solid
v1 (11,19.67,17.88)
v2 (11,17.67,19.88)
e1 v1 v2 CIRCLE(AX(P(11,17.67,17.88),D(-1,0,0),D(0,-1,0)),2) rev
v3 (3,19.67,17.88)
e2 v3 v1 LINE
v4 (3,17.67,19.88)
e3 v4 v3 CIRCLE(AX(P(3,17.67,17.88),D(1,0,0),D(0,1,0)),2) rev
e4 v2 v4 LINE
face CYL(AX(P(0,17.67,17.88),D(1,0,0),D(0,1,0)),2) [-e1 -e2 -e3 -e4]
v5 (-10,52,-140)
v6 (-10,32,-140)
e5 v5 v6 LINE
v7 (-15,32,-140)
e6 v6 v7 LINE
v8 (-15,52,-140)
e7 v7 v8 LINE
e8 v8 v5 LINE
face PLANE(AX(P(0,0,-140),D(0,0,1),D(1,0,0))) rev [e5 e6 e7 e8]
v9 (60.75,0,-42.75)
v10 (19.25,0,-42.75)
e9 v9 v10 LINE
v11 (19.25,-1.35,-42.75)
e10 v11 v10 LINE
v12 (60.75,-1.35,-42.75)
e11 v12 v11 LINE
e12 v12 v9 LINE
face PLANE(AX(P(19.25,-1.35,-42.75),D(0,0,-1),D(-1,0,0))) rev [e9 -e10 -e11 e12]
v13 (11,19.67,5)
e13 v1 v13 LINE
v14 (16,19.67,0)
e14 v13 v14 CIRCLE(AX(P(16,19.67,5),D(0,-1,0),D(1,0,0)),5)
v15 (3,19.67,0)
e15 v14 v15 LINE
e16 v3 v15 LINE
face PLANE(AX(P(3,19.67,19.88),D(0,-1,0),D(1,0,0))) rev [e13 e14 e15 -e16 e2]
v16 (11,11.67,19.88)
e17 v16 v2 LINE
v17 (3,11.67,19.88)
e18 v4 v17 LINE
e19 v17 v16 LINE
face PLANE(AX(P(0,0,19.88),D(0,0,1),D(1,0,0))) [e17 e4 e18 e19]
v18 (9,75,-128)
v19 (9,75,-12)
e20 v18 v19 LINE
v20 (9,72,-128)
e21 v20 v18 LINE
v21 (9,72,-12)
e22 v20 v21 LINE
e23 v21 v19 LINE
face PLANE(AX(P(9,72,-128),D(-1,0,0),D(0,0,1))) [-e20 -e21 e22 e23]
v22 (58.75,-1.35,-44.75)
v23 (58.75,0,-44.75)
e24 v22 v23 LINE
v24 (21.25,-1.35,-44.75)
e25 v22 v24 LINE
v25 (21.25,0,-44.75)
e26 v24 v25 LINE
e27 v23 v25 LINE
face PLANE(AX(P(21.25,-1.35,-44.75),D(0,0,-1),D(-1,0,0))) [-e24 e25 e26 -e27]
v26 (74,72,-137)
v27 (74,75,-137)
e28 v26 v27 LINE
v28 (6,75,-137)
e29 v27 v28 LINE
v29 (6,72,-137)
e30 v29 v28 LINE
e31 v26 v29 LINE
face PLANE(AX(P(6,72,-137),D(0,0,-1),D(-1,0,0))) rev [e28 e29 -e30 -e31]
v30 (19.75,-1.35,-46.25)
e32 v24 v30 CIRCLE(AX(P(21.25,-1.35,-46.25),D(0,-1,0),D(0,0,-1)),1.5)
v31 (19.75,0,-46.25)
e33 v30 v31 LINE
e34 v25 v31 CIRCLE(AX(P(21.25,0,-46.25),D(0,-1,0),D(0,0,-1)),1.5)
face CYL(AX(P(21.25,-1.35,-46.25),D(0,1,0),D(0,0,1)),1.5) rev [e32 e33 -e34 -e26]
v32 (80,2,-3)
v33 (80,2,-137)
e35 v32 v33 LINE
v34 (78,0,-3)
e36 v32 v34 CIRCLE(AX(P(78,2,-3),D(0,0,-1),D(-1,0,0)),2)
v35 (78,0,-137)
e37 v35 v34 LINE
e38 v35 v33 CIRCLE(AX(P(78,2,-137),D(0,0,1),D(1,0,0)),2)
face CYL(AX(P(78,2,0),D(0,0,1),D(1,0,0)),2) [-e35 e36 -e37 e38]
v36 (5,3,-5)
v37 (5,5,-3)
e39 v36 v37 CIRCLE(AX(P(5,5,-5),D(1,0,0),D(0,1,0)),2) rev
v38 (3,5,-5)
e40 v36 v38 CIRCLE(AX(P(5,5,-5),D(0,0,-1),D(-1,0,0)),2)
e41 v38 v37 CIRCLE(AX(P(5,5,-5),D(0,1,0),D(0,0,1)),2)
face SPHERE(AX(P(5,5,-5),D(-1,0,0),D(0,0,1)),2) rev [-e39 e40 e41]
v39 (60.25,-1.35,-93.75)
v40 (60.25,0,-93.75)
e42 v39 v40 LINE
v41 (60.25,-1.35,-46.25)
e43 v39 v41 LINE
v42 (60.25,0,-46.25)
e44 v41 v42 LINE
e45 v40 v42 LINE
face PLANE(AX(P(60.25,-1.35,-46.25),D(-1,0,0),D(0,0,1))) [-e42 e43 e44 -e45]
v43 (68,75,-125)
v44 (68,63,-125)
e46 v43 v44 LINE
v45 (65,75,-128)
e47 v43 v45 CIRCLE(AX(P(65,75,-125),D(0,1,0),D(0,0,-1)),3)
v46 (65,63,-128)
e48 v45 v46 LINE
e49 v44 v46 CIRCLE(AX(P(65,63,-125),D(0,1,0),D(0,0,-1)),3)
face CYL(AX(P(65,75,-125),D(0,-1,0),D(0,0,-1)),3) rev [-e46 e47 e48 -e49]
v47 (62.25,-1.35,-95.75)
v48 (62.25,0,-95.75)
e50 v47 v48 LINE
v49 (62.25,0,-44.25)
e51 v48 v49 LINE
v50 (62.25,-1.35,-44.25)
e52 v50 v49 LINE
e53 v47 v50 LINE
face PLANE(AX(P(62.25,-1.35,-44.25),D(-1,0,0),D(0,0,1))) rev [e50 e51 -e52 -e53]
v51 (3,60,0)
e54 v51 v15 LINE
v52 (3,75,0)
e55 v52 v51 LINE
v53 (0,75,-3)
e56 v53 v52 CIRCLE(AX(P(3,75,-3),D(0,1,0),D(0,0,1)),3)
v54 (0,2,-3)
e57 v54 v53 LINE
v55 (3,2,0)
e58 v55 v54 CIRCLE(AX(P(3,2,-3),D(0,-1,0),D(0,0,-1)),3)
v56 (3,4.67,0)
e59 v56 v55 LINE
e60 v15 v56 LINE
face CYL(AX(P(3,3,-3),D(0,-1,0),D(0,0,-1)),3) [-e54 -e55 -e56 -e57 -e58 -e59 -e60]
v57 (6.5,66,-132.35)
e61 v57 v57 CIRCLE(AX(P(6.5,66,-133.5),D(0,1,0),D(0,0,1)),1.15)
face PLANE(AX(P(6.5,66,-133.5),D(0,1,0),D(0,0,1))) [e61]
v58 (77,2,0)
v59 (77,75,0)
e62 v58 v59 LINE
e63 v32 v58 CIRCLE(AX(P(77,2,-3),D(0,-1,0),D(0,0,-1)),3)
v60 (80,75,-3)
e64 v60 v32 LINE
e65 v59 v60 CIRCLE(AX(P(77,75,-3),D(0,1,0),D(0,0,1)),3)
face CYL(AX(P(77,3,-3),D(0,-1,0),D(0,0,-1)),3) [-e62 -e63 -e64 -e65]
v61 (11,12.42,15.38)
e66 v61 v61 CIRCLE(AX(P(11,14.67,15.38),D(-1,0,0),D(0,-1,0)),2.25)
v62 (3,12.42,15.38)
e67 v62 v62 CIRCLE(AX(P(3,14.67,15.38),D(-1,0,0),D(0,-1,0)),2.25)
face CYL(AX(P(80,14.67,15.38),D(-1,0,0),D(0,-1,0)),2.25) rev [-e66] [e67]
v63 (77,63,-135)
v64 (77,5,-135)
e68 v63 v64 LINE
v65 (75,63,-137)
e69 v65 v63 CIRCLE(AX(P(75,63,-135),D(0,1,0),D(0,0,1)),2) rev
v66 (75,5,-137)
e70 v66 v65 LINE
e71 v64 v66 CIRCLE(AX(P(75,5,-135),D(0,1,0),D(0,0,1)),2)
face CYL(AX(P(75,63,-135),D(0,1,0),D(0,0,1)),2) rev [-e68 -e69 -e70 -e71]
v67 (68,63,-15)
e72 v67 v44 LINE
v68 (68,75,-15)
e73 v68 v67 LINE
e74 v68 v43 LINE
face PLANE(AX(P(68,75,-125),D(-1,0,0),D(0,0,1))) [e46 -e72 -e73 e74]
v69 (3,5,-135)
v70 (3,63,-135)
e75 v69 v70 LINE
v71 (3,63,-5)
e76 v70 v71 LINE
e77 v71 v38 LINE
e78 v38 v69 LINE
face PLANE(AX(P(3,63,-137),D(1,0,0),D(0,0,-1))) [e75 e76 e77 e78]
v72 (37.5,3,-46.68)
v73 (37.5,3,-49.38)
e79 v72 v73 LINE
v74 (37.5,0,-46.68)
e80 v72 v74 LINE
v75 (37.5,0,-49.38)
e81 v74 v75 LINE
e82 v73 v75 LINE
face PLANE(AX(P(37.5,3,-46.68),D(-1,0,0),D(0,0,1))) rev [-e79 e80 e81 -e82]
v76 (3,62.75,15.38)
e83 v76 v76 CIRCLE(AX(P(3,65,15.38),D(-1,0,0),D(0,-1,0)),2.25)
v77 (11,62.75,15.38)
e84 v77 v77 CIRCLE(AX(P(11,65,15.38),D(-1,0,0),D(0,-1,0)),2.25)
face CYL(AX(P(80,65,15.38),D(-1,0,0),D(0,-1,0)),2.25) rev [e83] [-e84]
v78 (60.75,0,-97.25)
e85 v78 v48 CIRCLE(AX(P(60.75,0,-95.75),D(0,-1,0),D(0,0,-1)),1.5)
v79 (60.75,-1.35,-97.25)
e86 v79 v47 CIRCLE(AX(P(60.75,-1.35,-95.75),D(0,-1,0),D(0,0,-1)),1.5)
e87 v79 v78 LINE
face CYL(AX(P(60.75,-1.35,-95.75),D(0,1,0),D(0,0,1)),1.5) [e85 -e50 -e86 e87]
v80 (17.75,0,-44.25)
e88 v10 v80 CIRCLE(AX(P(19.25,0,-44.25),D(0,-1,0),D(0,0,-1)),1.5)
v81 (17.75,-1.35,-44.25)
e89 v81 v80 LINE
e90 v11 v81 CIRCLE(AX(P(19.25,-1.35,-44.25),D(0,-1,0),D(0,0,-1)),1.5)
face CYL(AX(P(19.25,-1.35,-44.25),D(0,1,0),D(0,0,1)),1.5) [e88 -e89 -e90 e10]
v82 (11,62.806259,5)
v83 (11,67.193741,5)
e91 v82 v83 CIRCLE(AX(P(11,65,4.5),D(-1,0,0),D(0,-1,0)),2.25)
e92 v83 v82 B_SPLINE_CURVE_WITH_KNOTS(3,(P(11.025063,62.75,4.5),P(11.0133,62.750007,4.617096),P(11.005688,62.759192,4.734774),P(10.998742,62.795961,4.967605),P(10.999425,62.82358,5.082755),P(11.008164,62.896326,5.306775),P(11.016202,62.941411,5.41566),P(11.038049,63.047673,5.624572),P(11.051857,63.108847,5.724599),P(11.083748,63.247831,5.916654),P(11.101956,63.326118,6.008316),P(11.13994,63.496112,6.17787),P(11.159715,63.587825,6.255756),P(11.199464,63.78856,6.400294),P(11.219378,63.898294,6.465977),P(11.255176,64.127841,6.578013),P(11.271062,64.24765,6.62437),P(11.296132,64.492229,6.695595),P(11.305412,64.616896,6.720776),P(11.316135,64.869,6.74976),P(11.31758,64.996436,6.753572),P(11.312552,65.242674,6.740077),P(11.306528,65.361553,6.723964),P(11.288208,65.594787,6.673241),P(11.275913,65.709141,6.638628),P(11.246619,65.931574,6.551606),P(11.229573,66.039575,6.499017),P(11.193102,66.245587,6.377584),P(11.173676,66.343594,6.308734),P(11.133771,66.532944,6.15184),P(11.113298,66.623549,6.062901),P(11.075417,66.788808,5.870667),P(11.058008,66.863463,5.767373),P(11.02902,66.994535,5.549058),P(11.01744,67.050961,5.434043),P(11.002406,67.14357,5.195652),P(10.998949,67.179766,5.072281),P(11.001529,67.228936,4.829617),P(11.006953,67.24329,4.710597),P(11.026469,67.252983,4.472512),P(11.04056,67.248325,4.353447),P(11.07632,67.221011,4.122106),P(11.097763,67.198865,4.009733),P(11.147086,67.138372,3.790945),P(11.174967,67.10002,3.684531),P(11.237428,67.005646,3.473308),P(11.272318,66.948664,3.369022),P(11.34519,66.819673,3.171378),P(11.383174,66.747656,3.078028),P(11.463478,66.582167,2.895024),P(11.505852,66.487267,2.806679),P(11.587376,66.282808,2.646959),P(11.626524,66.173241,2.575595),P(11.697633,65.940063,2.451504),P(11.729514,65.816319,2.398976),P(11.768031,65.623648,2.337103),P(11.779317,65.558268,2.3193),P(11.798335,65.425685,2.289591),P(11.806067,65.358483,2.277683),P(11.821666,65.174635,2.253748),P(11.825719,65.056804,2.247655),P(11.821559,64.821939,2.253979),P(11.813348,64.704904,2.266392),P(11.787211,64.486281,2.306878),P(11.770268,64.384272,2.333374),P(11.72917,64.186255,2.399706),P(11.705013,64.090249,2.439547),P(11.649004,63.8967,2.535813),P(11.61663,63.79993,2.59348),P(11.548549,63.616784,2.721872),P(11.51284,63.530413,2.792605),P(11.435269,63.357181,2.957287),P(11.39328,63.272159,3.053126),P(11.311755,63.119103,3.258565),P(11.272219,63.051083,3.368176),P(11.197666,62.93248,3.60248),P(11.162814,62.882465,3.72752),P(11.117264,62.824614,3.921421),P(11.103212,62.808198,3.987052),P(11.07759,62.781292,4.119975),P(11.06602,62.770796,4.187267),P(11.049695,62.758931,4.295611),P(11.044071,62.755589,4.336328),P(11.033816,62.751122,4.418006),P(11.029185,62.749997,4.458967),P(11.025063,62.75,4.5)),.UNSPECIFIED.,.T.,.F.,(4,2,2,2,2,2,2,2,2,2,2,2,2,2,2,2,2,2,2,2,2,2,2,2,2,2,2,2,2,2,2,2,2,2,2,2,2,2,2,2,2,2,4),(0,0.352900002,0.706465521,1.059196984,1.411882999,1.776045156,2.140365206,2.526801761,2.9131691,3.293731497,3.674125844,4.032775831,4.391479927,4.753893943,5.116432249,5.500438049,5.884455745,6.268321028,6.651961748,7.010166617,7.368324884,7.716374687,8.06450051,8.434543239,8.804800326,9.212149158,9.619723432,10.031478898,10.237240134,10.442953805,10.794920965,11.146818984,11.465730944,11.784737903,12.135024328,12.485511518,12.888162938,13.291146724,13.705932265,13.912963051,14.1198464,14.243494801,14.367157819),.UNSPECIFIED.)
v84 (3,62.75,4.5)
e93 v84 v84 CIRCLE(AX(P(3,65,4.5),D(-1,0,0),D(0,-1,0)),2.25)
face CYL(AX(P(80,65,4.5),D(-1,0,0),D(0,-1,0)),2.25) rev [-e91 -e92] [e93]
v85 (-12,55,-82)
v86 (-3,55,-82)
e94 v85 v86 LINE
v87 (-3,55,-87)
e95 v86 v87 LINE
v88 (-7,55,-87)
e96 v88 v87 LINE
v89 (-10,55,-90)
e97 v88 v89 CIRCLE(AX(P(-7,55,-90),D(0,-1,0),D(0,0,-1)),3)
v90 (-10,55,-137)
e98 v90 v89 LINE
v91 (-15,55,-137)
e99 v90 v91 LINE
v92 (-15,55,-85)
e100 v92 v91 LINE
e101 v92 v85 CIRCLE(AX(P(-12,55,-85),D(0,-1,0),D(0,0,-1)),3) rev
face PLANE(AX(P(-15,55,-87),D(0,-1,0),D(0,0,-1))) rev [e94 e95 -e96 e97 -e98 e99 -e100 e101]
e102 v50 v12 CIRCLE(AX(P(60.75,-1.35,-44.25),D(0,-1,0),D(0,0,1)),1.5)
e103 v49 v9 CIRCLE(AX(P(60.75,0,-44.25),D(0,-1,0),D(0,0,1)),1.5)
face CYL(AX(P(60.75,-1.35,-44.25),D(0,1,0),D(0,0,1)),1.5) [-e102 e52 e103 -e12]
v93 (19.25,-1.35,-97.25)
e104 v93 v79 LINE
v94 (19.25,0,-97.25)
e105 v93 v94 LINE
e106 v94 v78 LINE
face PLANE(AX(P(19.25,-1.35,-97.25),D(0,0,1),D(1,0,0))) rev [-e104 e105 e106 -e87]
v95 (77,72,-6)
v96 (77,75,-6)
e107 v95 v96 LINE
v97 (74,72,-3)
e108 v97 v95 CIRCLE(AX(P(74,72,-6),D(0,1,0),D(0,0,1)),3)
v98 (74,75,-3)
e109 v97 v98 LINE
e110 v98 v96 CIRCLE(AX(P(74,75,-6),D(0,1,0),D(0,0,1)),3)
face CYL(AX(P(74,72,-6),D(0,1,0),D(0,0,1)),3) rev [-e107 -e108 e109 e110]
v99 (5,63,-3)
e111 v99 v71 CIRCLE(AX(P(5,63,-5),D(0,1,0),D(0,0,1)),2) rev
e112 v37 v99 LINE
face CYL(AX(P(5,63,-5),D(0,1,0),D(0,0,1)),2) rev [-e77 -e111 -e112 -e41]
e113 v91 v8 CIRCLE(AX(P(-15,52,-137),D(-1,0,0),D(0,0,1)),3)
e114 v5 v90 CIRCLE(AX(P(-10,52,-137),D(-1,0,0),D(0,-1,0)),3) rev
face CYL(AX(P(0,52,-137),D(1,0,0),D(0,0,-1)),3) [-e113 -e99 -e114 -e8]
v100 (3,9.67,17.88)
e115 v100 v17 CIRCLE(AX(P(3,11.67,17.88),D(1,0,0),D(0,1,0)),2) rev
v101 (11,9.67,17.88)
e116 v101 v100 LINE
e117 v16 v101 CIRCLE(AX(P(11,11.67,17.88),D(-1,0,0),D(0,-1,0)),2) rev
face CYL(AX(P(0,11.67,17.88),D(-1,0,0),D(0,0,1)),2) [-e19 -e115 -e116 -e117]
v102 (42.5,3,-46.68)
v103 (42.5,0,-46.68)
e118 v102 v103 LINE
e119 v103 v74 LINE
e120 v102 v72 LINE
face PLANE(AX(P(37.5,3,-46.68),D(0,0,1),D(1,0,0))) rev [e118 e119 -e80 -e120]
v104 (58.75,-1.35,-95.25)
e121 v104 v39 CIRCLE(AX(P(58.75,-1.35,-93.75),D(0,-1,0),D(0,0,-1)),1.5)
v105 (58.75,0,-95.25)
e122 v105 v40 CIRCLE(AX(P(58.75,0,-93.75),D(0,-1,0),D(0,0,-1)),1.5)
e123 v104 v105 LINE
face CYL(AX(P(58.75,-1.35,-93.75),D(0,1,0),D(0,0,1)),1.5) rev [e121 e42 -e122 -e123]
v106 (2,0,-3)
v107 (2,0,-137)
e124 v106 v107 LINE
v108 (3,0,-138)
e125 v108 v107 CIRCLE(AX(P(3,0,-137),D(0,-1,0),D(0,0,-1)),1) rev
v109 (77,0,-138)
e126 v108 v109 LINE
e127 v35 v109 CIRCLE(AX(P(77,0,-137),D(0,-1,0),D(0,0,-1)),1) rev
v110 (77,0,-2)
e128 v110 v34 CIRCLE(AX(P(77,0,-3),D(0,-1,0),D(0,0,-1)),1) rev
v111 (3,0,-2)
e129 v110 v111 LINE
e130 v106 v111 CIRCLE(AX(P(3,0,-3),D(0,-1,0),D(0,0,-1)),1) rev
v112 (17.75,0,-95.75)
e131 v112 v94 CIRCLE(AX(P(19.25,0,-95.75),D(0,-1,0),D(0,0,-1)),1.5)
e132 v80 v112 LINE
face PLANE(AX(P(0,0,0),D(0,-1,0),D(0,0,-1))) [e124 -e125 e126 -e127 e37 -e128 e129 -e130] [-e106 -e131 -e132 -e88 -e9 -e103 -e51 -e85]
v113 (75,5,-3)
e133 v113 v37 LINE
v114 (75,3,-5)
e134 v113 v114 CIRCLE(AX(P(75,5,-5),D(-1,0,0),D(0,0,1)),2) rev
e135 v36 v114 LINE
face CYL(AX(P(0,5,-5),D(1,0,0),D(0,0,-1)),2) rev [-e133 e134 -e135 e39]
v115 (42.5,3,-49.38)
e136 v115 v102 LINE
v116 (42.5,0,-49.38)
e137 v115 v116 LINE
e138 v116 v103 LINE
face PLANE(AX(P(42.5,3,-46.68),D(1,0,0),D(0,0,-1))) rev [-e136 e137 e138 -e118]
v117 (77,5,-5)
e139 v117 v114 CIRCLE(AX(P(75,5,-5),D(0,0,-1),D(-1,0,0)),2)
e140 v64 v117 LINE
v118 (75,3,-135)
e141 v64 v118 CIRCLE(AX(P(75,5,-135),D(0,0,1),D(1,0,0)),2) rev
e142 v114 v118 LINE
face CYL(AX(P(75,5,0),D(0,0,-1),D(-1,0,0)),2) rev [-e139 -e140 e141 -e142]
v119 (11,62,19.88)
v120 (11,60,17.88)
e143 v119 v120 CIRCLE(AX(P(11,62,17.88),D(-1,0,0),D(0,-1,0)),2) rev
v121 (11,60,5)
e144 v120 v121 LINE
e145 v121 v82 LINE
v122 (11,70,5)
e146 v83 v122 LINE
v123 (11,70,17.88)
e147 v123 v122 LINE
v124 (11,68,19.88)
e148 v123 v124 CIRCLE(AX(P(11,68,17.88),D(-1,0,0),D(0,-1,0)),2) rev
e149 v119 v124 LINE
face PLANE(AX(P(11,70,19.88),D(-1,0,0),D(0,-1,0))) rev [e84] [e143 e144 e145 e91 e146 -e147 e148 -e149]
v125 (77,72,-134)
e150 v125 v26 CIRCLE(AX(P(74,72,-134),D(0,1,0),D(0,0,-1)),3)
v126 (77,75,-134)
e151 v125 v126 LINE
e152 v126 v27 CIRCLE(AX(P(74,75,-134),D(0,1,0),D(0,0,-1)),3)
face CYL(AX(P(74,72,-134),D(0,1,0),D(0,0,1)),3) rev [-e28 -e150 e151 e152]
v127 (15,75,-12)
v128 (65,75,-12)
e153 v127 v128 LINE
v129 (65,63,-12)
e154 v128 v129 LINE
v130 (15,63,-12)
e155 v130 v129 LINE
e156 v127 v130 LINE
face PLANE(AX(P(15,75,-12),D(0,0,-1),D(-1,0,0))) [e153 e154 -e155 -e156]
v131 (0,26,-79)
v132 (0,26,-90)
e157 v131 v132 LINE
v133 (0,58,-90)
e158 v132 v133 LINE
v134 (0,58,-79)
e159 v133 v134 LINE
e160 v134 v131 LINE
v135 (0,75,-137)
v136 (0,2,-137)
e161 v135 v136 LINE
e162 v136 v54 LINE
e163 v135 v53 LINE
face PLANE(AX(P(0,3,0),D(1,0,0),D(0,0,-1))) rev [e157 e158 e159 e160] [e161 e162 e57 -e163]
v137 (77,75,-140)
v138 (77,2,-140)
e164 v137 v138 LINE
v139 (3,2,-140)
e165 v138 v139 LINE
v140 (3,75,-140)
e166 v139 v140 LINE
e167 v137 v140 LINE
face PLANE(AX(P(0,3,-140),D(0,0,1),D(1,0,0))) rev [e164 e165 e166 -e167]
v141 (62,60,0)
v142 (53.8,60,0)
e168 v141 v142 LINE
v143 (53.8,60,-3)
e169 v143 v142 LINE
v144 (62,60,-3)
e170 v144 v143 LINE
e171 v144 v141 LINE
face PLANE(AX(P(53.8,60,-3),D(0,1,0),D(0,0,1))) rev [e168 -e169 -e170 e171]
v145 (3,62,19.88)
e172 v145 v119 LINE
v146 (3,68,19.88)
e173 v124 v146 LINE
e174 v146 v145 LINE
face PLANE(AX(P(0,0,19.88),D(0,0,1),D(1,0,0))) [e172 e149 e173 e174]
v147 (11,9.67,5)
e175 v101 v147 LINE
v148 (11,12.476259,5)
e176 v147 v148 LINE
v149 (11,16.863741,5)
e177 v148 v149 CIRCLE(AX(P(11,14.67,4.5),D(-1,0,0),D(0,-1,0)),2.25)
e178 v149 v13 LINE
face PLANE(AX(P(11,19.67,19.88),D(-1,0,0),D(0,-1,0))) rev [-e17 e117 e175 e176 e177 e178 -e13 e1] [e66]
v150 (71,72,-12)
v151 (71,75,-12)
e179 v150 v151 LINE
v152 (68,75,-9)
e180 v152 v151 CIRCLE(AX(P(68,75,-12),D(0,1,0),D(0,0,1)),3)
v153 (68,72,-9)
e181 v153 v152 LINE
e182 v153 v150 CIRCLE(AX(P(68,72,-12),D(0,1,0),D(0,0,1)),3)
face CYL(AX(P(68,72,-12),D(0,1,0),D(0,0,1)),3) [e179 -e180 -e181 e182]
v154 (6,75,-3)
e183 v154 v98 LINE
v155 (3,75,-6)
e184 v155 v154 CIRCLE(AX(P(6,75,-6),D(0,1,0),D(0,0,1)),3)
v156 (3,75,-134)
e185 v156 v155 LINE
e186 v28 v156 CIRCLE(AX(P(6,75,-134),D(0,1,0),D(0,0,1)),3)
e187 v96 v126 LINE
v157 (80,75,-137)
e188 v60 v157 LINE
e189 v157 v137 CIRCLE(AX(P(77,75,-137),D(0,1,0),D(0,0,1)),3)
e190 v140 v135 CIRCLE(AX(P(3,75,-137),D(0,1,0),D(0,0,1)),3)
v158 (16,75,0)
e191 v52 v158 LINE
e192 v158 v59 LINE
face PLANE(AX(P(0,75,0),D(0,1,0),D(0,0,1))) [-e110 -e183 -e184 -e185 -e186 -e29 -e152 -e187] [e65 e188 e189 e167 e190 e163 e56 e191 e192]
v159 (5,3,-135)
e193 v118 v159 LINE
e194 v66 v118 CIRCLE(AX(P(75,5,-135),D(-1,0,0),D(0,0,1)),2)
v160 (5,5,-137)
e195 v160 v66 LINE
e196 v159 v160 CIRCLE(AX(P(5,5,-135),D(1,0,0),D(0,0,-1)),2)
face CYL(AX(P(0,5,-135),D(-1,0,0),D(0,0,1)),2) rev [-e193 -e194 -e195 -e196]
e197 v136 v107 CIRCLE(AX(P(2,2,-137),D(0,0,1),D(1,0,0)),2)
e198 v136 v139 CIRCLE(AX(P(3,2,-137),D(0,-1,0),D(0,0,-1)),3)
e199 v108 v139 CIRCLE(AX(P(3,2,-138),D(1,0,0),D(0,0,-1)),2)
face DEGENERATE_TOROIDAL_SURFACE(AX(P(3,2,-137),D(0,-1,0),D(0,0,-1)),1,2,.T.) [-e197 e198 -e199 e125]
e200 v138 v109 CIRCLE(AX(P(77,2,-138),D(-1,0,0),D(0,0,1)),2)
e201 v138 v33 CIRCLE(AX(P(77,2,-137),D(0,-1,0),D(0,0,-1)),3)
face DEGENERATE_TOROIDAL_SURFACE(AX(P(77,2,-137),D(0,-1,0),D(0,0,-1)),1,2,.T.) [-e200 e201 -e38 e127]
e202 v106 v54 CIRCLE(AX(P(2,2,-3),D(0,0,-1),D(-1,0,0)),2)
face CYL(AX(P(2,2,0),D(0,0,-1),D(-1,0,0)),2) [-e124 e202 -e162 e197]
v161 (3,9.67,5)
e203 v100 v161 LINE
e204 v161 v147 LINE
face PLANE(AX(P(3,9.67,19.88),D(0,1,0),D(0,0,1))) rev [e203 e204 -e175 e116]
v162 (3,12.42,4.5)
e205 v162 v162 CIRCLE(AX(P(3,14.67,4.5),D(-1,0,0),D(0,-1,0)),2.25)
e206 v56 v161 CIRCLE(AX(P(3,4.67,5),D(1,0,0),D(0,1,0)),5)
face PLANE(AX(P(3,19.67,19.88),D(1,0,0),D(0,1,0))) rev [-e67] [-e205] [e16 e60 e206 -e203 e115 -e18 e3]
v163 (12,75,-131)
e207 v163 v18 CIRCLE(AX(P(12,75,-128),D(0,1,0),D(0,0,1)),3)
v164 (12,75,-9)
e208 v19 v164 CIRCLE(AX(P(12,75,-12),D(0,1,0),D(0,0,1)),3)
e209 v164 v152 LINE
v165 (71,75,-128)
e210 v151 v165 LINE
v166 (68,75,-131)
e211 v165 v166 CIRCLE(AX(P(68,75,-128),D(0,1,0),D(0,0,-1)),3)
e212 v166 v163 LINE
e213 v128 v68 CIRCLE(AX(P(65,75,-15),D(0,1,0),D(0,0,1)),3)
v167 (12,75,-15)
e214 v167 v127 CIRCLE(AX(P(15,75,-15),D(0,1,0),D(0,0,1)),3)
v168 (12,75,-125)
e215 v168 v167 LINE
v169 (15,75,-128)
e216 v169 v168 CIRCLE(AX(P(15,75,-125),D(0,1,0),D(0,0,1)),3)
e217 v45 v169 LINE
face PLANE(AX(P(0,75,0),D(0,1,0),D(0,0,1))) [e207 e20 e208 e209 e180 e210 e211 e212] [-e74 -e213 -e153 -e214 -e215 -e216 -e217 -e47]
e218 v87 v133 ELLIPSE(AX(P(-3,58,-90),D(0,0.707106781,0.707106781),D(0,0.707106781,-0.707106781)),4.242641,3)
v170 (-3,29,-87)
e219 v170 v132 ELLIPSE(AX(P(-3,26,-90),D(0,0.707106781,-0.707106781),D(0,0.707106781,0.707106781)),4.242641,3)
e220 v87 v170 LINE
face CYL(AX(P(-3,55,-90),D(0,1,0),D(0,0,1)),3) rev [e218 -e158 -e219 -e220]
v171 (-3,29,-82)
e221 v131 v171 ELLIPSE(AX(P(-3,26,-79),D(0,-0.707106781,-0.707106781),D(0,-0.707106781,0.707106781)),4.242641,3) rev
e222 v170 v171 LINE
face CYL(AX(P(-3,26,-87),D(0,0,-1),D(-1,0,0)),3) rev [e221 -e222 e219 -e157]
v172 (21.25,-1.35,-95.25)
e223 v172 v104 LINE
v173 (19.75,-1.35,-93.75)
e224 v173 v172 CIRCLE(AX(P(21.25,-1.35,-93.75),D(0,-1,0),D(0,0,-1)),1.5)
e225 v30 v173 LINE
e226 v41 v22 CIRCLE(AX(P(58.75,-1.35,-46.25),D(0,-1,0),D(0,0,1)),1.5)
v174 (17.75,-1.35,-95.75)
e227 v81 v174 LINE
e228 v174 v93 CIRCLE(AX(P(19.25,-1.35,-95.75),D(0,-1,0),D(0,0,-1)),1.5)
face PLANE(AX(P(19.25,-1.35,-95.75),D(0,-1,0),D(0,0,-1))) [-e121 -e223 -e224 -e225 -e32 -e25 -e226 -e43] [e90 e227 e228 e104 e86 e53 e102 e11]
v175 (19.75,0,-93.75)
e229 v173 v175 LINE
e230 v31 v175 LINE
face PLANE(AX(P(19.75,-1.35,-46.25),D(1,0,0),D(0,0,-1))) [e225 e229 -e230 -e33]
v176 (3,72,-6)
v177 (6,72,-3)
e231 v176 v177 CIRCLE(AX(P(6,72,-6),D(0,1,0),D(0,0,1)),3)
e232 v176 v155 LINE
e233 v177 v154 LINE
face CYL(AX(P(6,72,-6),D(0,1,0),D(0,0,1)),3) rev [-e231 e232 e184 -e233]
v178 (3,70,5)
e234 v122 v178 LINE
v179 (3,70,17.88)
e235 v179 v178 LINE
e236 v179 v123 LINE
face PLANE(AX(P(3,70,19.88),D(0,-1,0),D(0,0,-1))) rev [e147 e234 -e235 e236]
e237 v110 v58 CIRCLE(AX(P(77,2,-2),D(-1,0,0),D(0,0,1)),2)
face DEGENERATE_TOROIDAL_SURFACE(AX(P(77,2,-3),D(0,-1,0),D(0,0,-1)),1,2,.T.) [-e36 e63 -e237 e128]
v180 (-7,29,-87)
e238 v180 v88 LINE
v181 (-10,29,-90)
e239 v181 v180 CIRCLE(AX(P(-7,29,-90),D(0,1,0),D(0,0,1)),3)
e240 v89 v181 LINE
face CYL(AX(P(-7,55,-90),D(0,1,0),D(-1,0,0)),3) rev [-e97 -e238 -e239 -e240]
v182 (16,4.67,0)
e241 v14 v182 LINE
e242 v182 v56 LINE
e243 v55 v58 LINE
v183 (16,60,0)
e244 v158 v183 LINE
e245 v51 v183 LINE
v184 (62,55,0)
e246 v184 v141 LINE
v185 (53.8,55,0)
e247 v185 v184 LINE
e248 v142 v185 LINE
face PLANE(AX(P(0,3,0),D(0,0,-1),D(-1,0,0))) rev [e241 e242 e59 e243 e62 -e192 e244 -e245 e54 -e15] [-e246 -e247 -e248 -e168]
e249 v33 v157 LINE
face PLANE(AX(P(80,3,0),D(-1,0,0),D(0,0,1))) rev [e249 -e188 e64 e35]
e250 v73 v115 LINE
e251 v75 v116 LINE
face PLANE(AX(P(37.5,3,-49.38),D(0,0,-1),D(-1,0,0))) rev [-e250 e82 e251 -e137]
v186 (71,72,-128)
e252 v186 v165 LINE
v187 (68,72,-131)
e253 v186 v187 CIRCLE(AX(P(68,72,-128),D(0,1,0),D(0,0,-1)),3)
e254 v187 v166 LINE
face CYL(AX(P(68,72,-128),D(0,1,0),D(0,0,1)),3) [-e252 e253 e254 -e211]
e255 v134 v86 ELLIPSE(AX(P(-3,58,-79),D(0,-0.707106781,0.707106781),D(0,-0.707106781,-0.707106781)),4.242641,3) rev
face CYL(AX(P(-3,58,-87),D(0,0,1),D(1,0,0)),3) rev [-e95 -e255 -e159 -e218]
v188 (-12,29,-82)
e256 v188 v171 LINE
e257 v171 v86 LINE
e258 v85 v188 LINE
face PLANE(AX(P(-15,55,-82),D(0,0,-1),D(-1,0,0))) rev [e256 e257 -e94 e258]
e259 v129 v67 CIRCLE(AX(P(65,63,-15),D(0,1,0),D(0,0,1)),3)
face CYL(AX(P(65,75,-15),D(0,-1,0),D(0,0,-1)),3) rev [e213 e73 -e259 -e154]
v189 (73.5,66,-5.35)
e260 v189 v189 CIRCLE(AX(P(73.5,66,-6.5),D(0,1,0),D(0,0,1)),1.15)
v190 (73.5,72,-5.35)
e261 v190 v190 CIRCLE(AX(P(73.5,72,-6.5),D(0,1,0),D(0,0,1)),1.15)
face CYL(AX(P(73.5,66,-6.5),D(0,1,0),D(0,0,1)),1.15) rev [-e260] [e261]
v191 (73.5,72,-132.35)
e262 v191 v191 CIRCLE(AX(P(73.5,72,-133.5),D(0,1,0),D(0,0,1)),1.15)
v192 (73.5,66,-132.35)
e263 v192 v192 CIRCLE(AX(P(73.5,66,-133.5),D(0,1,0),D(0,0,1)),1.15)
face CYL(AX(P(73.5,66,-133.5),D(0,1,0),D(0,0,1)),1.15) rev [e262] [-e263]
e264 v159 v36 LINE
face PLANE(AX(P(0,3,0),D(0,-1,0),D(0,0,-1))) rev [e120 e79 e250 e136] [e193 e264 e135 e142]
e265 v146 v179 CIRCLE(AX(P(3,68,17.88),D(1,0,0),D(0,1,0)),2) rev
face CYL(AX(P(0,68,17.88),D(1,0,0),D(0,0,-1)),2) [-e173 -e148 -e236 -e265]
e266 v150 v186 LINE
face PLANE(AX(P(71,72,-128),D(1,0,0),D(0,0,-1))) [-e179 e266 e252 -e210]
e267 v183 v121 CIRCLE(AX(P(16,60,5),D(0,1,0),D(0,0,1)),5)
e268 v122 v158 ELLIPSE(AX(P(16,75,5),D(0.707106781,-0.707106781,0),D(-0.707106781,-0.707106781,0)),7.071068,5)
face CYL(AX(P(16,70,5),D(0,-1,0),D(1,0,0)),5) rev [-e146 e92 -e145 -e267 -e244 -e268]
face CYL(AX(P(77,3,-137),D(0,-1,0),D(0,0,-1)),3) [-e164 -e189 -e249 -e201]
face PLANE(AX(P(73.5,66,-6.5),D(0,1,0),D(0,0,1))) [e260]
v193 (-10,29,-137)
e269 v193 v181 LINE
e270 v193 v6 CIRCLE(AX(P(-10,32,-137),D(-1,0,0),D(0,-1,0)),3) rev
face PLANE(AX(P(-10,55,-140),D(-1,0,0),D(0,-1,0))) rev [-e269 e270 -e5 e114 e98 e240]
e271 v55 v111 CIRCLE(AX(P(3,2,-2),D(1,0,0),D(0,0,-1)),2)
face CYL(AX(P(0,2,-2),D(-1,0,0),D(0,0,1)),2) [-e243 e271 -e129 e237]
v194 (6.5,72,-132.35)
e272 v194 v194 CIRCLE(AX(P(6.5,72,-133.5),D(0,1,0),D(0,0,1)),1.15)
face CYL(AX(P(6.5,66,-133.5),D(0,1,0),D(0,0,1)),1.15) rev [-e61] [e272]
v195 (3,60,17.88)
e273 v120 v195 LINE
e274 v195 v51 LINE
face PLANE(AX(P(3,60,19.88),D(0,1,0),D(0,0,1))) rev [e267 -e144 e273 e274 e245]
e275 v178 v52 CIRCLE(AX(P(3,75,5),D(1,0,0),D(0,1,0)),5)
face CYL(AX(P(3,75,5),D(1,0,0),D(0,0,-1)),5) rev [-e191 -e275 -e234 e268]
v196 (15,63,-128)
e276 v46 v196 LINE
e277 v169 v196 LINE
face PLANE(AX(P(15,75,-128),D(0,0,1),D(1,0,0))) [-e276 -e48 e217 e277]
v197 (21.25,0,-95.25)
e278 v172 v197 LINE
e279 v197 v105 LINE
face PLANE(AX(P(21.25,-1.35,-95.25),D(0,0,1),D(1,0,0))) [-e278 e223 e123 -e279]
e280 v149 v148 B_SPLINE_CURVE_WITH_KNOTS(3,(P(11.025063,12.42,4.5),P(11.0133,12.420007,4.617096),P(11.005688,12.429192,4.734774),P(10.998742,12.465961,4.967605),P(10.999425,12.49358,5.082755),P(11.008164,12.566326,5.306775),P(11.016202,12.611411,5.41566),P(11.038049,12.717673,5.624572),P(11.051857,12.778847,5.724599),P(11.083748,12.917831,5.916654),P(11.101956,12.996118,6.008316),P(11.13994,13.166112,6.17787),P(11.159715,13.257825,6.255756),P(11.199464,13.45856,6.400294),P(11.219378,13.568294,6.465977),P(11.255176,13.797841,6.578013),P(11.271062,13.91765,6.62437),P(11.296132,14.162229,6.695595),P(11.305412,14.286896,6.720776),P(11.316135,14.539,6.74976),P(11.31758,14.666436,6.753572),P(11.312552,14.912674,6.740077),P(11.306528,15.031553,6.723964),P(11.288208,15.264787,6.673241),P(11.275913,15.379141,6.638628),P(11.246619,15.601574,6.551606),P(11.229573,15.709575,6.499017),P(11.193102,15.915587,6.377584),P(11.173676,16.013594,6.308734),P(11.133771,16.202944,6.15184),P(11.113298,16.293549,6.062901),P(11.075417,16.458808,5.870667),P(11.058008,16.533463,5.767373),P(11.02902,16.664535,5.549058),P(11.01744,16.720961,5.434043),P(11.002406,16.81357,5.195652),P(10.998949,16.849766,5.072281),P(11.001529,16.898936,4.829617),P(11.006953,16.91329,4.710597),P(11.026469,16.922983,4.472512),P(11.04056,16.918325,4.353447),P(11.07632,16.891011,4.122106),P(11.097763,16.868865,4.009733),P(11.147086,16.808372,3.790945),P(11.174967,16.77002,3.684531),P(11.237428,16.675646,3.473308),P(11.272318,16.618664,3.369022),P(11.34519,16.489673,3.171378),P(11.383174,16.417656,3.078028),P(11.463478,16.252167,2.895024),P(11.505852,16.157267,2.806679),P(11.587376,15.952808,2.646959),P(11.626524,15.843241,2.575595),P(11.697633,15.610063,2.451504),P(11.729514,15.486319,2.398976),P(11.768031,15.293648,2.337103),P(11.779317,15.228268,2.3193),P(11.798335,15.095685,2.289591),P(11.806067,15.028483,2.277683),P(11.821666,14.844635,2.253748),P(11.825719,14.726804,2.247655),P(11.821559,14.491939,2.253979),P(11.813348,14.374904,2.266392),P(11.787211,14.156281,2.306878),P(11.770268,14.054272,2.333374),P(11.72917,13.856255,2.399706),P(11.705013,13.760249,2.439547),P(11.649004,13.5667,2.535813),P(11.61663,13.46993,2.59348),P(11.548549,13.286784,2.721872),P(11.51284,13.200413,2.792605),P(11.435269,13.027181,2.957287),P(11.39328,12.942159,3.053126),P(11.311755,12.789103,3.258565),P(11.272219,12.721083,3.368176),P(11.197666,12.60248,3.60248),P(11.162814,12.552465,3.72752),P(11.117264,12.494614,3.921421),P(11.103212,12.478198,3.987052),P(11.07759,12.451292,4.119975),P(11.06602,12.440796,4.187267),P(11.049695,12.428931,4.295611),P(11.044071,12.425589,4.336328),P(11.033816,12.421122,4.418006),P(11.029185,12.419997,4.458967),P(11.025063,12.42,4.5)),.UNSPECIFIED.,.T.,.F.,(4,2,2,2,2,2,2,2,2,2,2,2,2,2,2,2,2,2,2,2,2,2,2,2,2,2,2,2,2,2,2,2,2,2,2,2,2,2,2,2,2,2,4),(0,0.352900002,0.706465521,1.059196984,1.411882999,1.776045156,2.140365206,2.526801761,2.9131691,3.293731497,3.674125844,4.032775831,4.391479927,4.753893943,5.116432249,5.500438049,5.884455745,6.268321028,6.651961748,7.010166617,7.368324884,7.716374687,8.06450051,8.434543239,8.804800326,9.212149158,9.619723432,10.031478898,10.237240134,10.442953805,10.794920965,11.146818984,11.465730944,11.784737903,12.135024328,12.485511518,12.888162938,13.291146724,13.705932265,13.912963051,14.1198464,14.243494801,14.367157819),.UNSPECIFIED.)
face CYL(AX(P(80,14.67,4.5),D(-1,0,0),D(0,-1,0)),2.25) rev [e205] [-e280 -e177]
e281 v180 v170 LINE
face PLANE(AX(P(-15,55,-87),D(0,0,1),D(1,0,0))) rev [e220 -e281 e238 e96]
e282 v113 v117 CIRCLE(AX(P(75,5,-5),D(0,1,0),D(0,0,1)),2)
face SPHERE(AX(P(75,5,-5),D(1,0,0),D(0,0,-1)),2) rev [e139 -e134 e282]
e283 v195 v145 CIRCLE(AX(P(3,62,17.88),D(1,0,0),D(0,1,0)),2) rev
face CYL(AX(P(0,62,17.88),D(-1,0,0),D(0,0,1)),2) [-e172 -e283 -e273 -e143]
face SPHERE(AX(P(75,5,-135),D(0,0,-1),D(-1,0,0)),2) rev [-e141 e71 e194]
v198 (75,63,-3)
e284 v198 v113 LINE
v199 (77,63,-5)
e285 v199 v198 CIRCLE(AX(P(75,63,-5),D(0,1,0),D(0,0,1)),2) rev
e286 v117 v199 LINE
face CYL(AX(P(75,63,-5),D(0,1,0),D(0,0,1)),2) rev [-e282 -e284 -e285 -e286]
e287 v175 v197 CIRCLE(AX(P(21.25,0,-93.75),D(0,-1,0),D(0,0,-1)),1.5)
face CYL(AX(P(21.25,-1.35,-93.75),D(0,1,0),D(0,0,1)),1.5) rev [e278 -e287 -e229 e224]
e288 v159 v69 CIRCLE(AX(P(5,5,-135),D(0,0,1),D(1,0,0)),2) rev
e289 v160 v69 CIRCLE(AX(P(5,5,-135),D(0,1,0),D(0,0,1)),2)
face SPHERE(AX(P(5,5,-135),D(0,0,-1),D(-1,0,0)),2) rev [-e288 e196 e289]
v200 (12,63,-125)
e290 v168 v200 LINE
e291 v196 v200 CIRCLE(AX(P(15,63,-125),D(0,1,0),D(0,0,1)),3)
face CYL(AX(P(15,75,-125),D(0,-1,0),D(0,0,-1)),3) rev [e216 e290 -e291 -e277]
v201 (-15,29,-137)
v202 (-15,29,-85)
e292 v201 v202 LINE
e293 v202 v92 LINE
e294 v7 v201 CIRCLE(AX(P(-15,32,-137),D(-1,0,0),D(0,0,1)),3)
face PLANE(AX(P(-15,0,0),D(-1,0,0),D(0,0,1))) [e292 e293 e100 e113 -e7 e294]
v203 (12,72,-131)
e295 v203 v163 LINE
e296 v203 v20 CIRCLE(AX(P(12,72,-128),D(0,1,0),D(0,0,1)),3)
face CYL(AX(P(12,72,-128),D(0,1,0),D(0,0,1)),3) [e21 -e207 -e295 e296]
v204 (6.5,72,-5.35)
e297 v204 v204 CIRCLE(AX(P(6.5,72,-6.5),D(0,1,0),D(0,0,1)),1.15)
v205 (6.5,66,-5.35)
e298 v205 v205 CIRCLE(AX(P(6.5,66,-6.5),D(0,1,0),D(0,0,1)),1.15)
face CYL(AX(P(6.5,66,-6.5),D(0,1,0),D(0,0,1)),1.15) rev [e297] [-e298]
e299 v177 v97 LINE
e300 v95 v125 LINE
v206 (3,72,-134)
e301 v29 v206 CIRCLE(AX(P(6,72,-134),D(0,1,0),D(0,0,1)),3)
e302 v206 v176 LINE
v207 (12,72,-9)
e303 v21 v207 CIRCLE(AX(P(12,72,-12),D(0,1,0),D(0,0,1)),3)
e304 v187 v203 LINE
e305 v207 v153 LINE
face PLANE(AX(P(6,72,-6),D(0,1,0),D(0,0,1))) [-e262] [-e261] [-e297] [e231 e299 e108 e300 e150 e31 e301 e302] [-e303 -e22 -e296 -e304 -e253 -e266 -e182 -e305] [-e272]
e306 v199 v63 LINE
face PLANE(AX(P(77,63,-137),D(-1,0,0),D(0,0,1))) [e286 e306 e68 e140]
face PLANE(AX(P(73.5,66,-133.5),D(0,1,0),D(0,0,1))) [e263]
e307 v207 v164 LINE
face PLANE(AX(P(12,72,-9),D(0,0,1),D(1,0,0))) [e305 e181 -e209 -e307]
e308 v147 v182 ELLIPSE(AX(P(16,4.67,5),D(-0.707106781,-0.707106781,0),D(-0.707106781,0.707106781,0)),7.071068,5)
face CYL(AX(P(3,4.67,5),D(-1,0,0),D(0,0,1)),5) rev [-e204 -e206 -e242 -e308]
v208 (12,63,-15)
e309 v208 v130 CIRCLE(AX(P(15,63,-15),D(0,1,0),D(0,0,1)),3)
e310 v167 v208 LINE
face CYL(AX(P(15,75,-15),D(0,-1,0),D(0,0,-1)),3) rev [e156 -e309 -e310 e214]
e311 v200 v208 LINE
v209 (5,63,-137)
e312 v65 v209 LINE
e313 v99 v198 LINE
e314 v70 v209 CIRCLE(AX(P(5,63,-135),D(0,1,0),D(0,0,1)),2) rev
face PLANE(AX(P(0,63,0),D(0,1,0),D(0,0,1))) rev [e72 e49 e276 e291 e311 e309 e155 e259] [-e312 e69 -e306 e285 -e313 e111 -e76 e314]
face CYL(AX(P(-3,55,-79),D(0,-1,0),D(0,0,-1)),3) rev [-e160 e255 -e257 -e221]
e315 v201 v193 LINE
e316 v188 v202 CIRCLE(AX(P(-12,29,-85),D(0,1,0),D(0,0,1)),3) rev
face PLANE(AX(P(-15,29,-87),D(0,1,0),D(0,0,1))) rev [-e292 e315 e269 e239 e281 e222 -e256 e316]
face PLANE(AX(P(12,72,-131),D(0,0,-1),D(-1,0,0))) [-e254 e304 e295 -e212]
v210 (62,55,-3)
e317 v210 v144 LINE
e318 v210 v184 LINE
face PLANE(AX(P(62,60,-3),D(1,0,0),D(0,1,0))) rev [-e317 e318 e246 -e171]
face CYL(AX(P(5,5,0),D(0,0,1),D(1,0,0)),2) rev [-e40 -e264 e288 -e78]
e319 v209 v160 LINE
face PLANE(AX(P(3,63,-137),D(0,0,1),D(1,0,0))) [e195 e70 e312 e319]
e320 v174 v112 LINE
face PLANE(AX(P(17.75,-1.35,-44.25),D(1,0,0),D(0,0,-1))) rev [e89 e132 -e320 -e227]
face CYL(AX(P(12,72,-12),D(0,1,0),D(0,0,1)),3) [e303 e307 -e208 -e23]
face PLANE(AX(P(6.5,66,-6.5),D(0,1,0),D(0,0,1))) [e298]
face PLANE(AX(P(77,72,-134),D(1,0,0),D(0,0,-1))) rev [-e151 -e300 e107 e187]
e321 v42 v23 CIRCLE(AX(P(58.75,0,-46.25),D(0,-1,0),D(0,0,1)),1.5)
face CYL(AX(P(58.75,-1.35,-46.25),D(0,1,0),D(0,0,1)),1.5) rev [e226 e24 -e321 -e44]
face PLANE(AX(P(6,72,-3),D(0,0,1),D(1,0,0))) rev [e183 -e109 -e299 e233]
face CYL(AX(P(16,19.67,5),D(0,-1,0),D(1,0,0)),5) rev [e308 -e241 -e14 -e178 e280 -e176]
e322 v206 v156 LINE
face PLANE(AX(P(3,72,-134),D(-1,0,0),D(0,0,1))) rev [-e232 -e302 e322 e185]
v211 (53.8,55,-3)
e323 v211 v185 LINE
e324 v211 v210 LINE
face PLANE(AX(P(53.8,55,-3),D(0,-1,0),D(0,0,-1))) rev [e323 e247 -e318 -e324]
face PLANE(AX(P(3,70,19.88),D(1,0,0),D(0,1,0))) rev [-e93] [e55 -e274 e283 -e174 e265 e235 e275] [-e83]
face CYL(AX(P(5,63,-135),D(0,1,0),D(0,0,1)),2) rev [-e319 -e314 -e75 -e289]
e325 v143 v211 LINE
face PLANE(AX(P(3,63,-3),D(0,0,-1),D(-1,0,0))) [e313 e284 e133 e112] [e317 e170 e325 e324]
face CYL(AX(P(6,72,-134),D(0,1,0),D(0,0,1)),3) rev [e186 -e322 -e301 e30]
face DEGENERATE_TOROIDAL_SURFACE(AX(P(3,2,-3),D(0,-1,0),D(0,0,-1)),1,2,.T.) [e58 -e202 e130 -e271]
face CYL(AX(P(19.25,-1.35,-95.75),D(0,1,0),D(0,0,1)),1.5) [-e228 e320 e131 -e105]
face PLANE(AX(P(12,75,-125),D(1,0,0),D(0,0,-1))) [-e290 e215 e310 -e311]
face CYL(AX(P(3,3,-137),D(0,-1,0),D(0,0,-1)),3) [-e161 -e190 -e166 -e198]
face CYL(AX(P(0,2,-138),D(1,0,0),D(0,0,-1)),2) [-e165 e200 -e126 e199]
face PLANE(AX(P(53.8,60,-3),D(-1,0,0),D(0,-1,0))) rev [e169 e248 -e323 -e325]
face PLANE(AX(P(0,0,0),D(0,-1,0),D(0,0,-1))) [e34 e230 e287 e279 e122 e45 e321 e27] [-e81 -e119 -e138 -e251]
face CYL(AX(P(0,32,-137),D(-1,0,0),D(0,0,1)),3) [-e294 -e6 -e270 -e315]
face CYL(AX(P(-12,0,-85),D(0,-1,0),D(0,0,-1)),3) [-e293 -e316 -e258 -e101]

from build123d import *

# Parameters (mm, degrees)
SKETCH1_W           = 80
SKETCH1_H           = 140
BOSS_EXTRUDE1_DEPTH = 3
SKETCH2_W           = 80
SKETCH2_H           = 140
SKETCH2_W_2         = 74
SKETCH2_H_2         = 134
BOSS_EXTRUDE2_DEPTH = 60
FILLET1_R           = 2
FILLET2_R           = 2
SKETCH6_W           = 80
SKETCH6_H           = 140
BOSS_EXTRUDE3_DEPTH = 12
CUT_EXTRUDE1_DEPTH  = 3
SKETCH8_R           = 1.15
CUT_EXTRUDE2_DEPTH  = 6
FILLET3_R           = 3
SKETCH9_W           = 5
SKETCH9_H           = 26
BOSS_EXTRUDE4_DEPTH = 15
SKETCH10_W          = 5
SKETCH10_H          = 26
BOSS_EXTRUDE5_DEPTH = 53
FILLET4_R           = 3
FILLET5_R           = 3
SKETCH12_W          = 8
SKETCH12_H          = 10
BOSS_EXTRUDE6_DEPTH = 19.88
FILLET6_R           = 5
FILLET7_R           = 2
SKETCH13_R          = 2.25
CUT_EXTRUDE3_DEPTH  = 177.504957437
SKETCH14_W          = 8.2
SKETCH14_H          = 5
CUT_EXTRUDE4_DEPTH  = 3
BOSS_EXTRUDE7_DEPTH = 1.35
SKETCH16_W          = 5
SKETCH16_H          = 2.7
CUT_EXTRUDE5_DEPTH  = 3


with BuildPart() as part:
    # Sketch1 → Boss-Extrude1 (new body)
    with BuildSketch(Plane(origin=(0, 0, 0), x_dir=(1, 0, 0), z_dir=(0, 1, 0))):
        with Locations((40, 70)):
            Rectangle(SKETCH1_W, SKETCH1_H)
    extrude(amount=BOSS_EXTRUDE1_DEPTH)

    # Sketch2 → Boss-Extrude2 (add)
    with BuildSketch(Plane(origin=(0, 3, 0), x_dir=(1, 0, 0), z_dir=(0, 1, 0))):
        with Locations((40, 70)):
            Rectangle(SKETCH2_W, SKETCH2_H)
        with Locations((40, 70)):
            Rectangle(SKETCH2_W_2, SKETCH2_H_2, mode=Mode.SUBTRACT)
    extrude(amount=BOSS_EXTRUDE2_DEPTH)

    # Fillet1
    fillet1_edges = [part.edges().sort_by_distance(p)[0] for p in [
        (3, 3, -70),
        (40, 3, -3),
        (77, 3, -70),
        (40, 3, -137),
        (3, 33, -3),
        (77, 33, -3),
        (77, 33, -137),
        (3, 33, -137),
    ]]
    fillet(fillet1_edges, radius=FILLET1_R)

    # Fillet2
    fillet2_edges = [part.edges().sort_by_distance(p)[0] for p in [
        (40, 0, -140),
        (80, 0, -70),
        (40, 0, 0),
        (0, 0, -70),
    ]]
    fillet(fillet2_edges, radius=FILLET2_R)

    # Sketch6 → Boss-Extrude3 (add)
    with BuildSketch(Plane(origin=(0, 63, 0), x_dir=(1, 0, 0), z_dir=(0, 1, 0))):
        with Locations((40, 70)):
            Rectangle(SKETCH6_W, SKETCH6_H)
        with BuildLine():
            Line((15, 128), (65, 128))
            ThreePointArc((65, 128), (67.121320344, 127.121320344), (68, 125))
            Line((68, 125), (68, 15))
            ThreePointArc((68, 15), (67.121320344, 12.878679656), (65, 12))
            Line((65, 12), (15, 12))
            ThreePointArc((15, 12), (12.878679656, 12.878679656), (12, 15))
            Line((12, 15), (12, 125))
            ThreePointArc((12, 125), (12.878679656, 127.121320344), (15, 128))
        make_face(mode=Mode.SUBTRACT)
    extrude(amount=BOSS_EXTRUDE3_DEPTH)

    # Sketch7 → Cut-Extrude1 (cut)
    with BuildSketch(Plane(origin=(0, 75, 0), x_dir=(1, 0, 0), z_dir=(0, 1, 0))):
        with BuildLine():
            Line((6, 137), (74, 137))
            ThreePointArc((74, 137), (76.121320344, 136.121320344), (77, 134))
            Line((77, 134), (77, 6))
            ThreePointArc((77, 6), (76.121320344, 3.878679656), (74, 3))
            Line((74, 3), (6, 3))
            ThreePointArc((6, 3), (3.878679656, 3.878679656), (3, 6))
            Line((3, 6), (3, 134))
            ThreePointArc((3, 134), (3.878679656, 136.121320344), (6, 137))
        make_face()
        with BuildLine():
            Line((12, 131), (68, 131))
            ThreePointArc((68, 131), (70.121320344, 130.121320344), (71, 128))
            Line((71, 128), (71, 12))
            ThreePointArc((71, 12), (70.121320344, 9.878679656), (68, 9))
            Line((68, 9), (12, 9))
            ThreePointArc((12, 9), (9.878679656, 9.878679656), (9, 12))
            Line((9, 12), (9, 128))
            ThreePointArc((9, 128), (9.878679656, 130.121320344), (12, 131))
        make_face(mode=Mode.SUBTRACT)
    extrude(amount=-CUT_EXTRUDE1_DEPTH, mode=Mode.SUBTRACT)

    # Sketch8 → Cut-Extrude2 (cut)
    with BuildSketch(Plane(origin=(0, 72, 0), x_dir=(1, 0, 0), z_dir=(0, 1, 0))):
        with Locations(Location((6.5, 6.5, 0), (0, 0, 270))):
            Circle(SKETCH8_R)
        with Locations(Location((73.5, 6.5, 0), (0, 0, 270))):
            Circle(SKETCH8_R)
        with Locations(Location((73.5, 133.5, 0), (0, 0, 270))):
            Circle(SKETCH8_R)
        with Locations(Location((6.5, 133.5, 0), (0, 0, 270))):
            Circle(SKETCH8_R)
    extrude(amount=-CUT_EXTRUDE2_DEPTH, mode=Mode.SUBTRACT)

    # Fillet3
    # the kernel refuses this fillet: 3 mm, written as the material it takes off along each edge
    with BuildSketch(Plane(origin=(77, 0, -3), x_dir=(1, 0, 0), z_dir=(0, 0, -1))) as fillet3_piece_1:
        with BuildLine():
            CenterArc((1, -2), 2, 0, 90)
            Line((3, -2), (3, 0))
            Line((3, 0), (1, 0))
        make_face()
    revolve(axis=Axis((77, 0, -3), (0, -1, 0)), revolution_arc=90, mode=Mode.SUBTRACT)
    with BuildSketch(Plane(origin=(3, 0, -3), x_dir=(0, 0, 1), z_dir=(1, 0, 0))) as fillet3_piece_2:
        with BuildLine():
            CenterArc((1, -2), 2, 0, 90)
            Line((3, -2), (3, 0))
            Line((3, 0), (1, 0))
        make_face()
    revolve(axis=Axis((3, 0, -3), (0, -1, 0)), revolution_arc=90, mode=Mode.SUBTRACT)
    with BuildSketch(Plane(origin=(77, 0, -137), x_dir=(0, 0, -1), z_dir=(-1, 0, 0))) as fillet3_piece_3:
        with BuildLine():
            CenterArc((1, -2), 2, 0, 90)
            Line((3, -2), (3, 0))
            Line((3, 0), (1, 0))
        make_face()
    revolve(axis=Axis((77, 0, -137), (0, -1, 0)), revolution_arc=90, mode=Mode.SUBTRACT)
    with BuildSketch(Plane(origin=(3, 0, -137), x_dir=(-1, 0, 0), z_dir=(0, 0, 1))) as fillet3_piece_4:
        with BuildLine():
            CenterArc((1, -2), 2, 0, 90)
            Line((3, -2), (3, 0))
            Line((3, 0), (1, 0))
        make_face()
    revolve(axis=Axis((3, 0, -137), (0, -1, 0)), revolution_arc=90, mode=Mode.SUBTRACT)
    with BuildSketch(Plane(origin=(0, 0, -140), x_dir=(1, 0, 0), z_dir=(0, 1, 0)), Plane(origin=(80, 82.5, -140), x_dir=(-1, 0, 0), z_dir=(0, -1, 0)), Plane(origin=(80, 82.5, 0), x_dir=(0, 0, -1), z_dir=(0, -1, 0)), Plane(origin=(0, 0, 0), x_dir=(0, 0, -1), z_dir=(0, 1, 0))) as fillet3_piece_5:
        with BuildLine():
            CenterArc((FILLET3_R, -FILLET3_R), FILLET3_R, 90, 90)
            Line((0, -FILLET3_R), (0, 0))
            Line((0, 0), (FILLET3_R, 0))
        make_face()
    extrude(amount=82.5, mode=Mode.SUBTRACT)

    # Sketch9 → Boss-Extrude4 (add)
    with BuildSketch(Plane.ZY):
        with Locations((-84.5, 42)):
            Rectangle(SKETCH9_W, SKETCH9_H)
    extrude(amount=BOSS_EXTRUDE4_DEPTH)

    # Sketch10 → Boss-Extrude5 (add)
    with BuildSketch(Plane(origin=(0, 0, -87), x_dir=(-1, 0, 0), z_dir=(0, 0, -1))):
        with Locations((12.5, 42)):
            Rectangle(SKETCH10_W, SKETCH10_H)
    extrude(amount=BOSS_EXTRUDE5_DEPTH)

    # Fillet4
    fillet4_edges = [part.edges().sort_by_distance(p)[0] for p in [
        (0, 42, -87),
        (0, 29, -84.5),
        (0, 42, -82),
        (0, 55, -84.5),
    ]]
    fillet(fillet4_edges, radius=FILLET4_R)

    # Fillet5
    fillet5_edges = [part.edges().sort_by_distance(p)[0] for p in [
        (-15, 42, -82),
        (-10, 42, -87),
        (-12.5, 55, -140),
        (-12.5, 29, -140),
    ]]
    fillet(fillet5_edges, radius=FILLET5_R)

    # Sketch12 → Boss-Extrude6 (add)
    with BuildSketch(Plane.XY):
        with Locations((7, 65)):
            Rectangle(SKETCH12_W, SKETCH12_H)
        with Locations((7, 14.67)):
            Rectangle(SKETCH12_W, SKETCH12_H)
    extrude(amount=BOSS_EXTRUDE6_DEPTH)

    # Fillet6
    # the kernel refuses this fillet: 5 mm, written as the material it adds along each edge
    with BuildSketch(Plane(origin=(11, 70, 0), x_dir=(1, 0, 0), z_dir=(0, -1, 0)), Plane(origin=(11, 19.67, 0), x_dir=(1, 0, 0), z_dir=(0, -1, 0))) as fillet6_piece_1:
        with BuildLine():
            CenterArc((FILLET6_R, FILLET6_R), FILLET6_R, 180, 90)
            Line((0, FILLET6_R), (0, 0))
            Line((0, 0), (FILLET6_R, 0))
        make_face()
    extrude(amount=10)
    with BuildSketch(Plane(origin=(3, 70, 0), x_dir=(0, 1, 0), z_dir=(1, 0, 0)), Plane(origin=(11, 9.67, 0), x_dir=(0, -1, 0), z_dir=(-1, 0, 0))) as fillet6_piece_2:
        with BuildLine():
            CenterArc((FILLET6_R, FILLET6_R), FILLET6_R, 180, 90)
            Line((0, FILLET6_R), (0, 0))
            Line((0, 0), (FILLET6_R, 0))
        make_face()
    extrude(amount=8)
    with BuildSketch(Plane(origin=(3, 70, 0), x_dir=(0, 1, 0), z_dir=(1, 0, 0))) as fillet6_piece_3a_section:
        with BuildLine():
            CenterArc((FILLET6_R, FILLET6_R), FILLET6_R, 180, 90)
            Line((0, FILLET6_R), (0, 0))
            Line((0, 0), (FILLET6_R, 0))
        make_face()
    fillet6_piece_3a = extrude(amount=20.5, mode=Mode.PRIVATE)
    fillet6_piece_3a = split(fillet6_piece_3a, bisect_by=Plane(origin=(11, 71.131975571, 1.131975571), z_dir=(1, 0, 0)), keep=Keep.TOP, mode=Mode.PRIVATE)
    with BuildSketch(Plane(origin=(11, 82.5, 0), x_dir=(1, 0, 0), z_dir=(0, -1, 0))) as fillet6_piece_3b_section:
        with BuildLine():
            CenterArc((FILLET6_R, FILLET6_R), FILLET6_R, 180, 90)
            Line((0, FILLET6_R), (0, 0))
            Line((0, 0), (FILLET6_R, 0))
        make_face()
    fillet6_piece_3b = extrude(amount=22.5, mode=Mode.PRIVATE)
    fillet6_piece_3b = split(fillet6_piece_3b, bisect_by=Plane(origin=(12.131975571, 75, 1.131975571), z_dir=(0, -1, 0)), keep=Keep.TOP, mode=Mode.PRIVATE)
    fillet6_piece_3b = split(fillet6_piece_3b, bisect_by=Plane(origin=(12.131975571, 70, 1.131975571), z_dir=(0, 1, 0)), keep=Keep.TOP, mode=Mode.PRIVATE)
    fillet6_piece_3 = fillet6_piece_3a & fillet6_piece_3b
    add(fillet6_piece_3)
    with BuildSketch(Plane(origin=(11, 19.67, 0), x_dir=(1, 0, 0), z_dir=(0, -1, 0))) as fillet6_piece_4a_section:
        with BuildLine():
            CenterArc((FILLET6_R, FILLET6_R), FILLET6_R, 180, 90)
            Line((0, FILLET6_R), (0, 0))
            Line((0, 0), (FILLET6_R, 0))
        make_face()
    fillet6_piece_4a = extrude(amount=22.5, mode=Mode.PRIVATE)
    fillet6_piece_4a = split(fillet6_piece_4a, bisect_by=Plane(origin=(12.131975571, 9.67, 1.131975571), z_dir=(0, -1, 0)), keep=Keep.TOP, mode=Mode.PRIVATE)
    with BuildSketch(Plane(origin=(23.5, 9.67, 0), x_dir=(0, -1, 0), z_dir=(-1, 0, 0))) as fillet6_piece_4b_section:
        with BuildLine():
            CenterArc((FILLET6_R, FILLET6_R), FILLET6_R, 180, 90)
            Line((0, FILLET6_R), (0, 0))
            Line((0, 0), (FILLET6_R, 0))
        make_face()
    fillet6_piece_4b = extrude(amount=20.5, mode=Mode.PRIVATE)
    fillet6_piece_4b = split(fillet6_piece_4b, bisect_by=Plane(origin=(11, 8.538024429, 1.131975571), z_dir=(1, 0, 0)), keep=Keep.TOP, mode=Mode.PRIVATE)
    fillet6_piece_4 = fillet6_piece_4a & fillet6_piece_4b
    add(fillet6_piece_4)

    # Fillet7
    fillet7_edges = [part.edges().sort_by_distance(p)[0] for p in [
        (7, 60, 19.88),
        (7, 70, 19.88),
        (7, 9.67, 19.88),
        (7, 19.67, 19.88),
    ]]
    fillet(fillet7_edges, radius=FILLET7_R)

    # Sketch13 → Cut-Extrude3 (cut, through all)
    with BuildSketch(Plane.ZY.offset(-3)):
        with Locations(Location((4.5, 65, 0), (0, 0, 270))):
            Circle(SKETCH13_R)
        with Locations(Location((15.38, 65, 0), (0, 0, 270))):
            Circle(SKETCH13_R)
        with Locations(Location((4.5, 14.67, 0), (0, 0, 270))):
            Circle(SKETCH13_R)
        with Locations(Location((15.38, 14.67, 0), (0, 0, 270))):
            Circle(SKETCH13_R)
    extrude(amount=-CUT_EXTRUDE3_DEPTH, mode=Mode.SUBTRACT)

    # Sketch14 → Cut-Extrude4 (cut)
    with BuildSketch(Plane.XY):
        with Locations((57.9, 57.5)):
            Rectangle(SKETCH14_W, SKETCH14_H)
    extrude(amount=-CUT_EXTRUDE4_DEPTH, mode=Mode.SUBTRACT)

    # Sketch15 → Boss-Extrude7 (add)
    with BuildSketch(Plane.XZ):
        with BuildLine():
            Line((19.25, -42.75), (60.75, -42.75))
            ThreePointArc((60.75, -42.75), (61.810660172, -43.189339828), (62.25, -44.25))
            Line((62.25, -44.25), (62.25, -95.75))
            ThreePointArc((62.25, -95.75), (61.810660172, -96.810660172), (60.75, -97.25))
            Line((60.75, -97.25), (19.25, -97.25))
            ThreePointArc((19.25, -97.25), (18.189339828, -96.810660172), (17.75, -95.75))
            Line((17.75, -95.75), (17.75, -44.25))
            ThreePointArc((17.75, -44.25), (18.189339828, -43.189339828), (19.25, -42.75))
        make_face()
        with BuildLine():
            Line((21.25, -44.75), (58.75, -44.75))
            ThreePointArc((58.75, -44.75), (59.810660172, -45.189339828), (60.25, -46.25))
            Line((60.25, -46.25), (60.25, -93.75))
            ThreePointArc((60.25, -93.75), (59.810660172, -94.810660172), (58.75, -95.25))
            Line((58.75, -95.25), (21.25, -95.25))
            ThreePointArc((21.25, -95.25), (20.189339828, -94.810660172), (19.75, -93.75))
            Line((19.75, -93.75), (19.75, -46.25))
            ThreePointArc((19.75, -46.25), (20.189339828, -45.189339828), (21.25, -44.75))
        make_face(mode=Mode.SUBTRACT)
    extrude(amount=BOSS_EXTRUDE7_DEPTH)

    # Sketch16 → Cut-Extrude5 (cut)
    with BuildSketch(Plane.XZ):
        with Locations((40, -48.03)):
            Rectangle(SKETCH16_W, SKETCH16_H)
    extrude(amount=-CUT_EXTRUDE5_DEPTH, mode=Mode.SUBTRACT)


solid = part.part
